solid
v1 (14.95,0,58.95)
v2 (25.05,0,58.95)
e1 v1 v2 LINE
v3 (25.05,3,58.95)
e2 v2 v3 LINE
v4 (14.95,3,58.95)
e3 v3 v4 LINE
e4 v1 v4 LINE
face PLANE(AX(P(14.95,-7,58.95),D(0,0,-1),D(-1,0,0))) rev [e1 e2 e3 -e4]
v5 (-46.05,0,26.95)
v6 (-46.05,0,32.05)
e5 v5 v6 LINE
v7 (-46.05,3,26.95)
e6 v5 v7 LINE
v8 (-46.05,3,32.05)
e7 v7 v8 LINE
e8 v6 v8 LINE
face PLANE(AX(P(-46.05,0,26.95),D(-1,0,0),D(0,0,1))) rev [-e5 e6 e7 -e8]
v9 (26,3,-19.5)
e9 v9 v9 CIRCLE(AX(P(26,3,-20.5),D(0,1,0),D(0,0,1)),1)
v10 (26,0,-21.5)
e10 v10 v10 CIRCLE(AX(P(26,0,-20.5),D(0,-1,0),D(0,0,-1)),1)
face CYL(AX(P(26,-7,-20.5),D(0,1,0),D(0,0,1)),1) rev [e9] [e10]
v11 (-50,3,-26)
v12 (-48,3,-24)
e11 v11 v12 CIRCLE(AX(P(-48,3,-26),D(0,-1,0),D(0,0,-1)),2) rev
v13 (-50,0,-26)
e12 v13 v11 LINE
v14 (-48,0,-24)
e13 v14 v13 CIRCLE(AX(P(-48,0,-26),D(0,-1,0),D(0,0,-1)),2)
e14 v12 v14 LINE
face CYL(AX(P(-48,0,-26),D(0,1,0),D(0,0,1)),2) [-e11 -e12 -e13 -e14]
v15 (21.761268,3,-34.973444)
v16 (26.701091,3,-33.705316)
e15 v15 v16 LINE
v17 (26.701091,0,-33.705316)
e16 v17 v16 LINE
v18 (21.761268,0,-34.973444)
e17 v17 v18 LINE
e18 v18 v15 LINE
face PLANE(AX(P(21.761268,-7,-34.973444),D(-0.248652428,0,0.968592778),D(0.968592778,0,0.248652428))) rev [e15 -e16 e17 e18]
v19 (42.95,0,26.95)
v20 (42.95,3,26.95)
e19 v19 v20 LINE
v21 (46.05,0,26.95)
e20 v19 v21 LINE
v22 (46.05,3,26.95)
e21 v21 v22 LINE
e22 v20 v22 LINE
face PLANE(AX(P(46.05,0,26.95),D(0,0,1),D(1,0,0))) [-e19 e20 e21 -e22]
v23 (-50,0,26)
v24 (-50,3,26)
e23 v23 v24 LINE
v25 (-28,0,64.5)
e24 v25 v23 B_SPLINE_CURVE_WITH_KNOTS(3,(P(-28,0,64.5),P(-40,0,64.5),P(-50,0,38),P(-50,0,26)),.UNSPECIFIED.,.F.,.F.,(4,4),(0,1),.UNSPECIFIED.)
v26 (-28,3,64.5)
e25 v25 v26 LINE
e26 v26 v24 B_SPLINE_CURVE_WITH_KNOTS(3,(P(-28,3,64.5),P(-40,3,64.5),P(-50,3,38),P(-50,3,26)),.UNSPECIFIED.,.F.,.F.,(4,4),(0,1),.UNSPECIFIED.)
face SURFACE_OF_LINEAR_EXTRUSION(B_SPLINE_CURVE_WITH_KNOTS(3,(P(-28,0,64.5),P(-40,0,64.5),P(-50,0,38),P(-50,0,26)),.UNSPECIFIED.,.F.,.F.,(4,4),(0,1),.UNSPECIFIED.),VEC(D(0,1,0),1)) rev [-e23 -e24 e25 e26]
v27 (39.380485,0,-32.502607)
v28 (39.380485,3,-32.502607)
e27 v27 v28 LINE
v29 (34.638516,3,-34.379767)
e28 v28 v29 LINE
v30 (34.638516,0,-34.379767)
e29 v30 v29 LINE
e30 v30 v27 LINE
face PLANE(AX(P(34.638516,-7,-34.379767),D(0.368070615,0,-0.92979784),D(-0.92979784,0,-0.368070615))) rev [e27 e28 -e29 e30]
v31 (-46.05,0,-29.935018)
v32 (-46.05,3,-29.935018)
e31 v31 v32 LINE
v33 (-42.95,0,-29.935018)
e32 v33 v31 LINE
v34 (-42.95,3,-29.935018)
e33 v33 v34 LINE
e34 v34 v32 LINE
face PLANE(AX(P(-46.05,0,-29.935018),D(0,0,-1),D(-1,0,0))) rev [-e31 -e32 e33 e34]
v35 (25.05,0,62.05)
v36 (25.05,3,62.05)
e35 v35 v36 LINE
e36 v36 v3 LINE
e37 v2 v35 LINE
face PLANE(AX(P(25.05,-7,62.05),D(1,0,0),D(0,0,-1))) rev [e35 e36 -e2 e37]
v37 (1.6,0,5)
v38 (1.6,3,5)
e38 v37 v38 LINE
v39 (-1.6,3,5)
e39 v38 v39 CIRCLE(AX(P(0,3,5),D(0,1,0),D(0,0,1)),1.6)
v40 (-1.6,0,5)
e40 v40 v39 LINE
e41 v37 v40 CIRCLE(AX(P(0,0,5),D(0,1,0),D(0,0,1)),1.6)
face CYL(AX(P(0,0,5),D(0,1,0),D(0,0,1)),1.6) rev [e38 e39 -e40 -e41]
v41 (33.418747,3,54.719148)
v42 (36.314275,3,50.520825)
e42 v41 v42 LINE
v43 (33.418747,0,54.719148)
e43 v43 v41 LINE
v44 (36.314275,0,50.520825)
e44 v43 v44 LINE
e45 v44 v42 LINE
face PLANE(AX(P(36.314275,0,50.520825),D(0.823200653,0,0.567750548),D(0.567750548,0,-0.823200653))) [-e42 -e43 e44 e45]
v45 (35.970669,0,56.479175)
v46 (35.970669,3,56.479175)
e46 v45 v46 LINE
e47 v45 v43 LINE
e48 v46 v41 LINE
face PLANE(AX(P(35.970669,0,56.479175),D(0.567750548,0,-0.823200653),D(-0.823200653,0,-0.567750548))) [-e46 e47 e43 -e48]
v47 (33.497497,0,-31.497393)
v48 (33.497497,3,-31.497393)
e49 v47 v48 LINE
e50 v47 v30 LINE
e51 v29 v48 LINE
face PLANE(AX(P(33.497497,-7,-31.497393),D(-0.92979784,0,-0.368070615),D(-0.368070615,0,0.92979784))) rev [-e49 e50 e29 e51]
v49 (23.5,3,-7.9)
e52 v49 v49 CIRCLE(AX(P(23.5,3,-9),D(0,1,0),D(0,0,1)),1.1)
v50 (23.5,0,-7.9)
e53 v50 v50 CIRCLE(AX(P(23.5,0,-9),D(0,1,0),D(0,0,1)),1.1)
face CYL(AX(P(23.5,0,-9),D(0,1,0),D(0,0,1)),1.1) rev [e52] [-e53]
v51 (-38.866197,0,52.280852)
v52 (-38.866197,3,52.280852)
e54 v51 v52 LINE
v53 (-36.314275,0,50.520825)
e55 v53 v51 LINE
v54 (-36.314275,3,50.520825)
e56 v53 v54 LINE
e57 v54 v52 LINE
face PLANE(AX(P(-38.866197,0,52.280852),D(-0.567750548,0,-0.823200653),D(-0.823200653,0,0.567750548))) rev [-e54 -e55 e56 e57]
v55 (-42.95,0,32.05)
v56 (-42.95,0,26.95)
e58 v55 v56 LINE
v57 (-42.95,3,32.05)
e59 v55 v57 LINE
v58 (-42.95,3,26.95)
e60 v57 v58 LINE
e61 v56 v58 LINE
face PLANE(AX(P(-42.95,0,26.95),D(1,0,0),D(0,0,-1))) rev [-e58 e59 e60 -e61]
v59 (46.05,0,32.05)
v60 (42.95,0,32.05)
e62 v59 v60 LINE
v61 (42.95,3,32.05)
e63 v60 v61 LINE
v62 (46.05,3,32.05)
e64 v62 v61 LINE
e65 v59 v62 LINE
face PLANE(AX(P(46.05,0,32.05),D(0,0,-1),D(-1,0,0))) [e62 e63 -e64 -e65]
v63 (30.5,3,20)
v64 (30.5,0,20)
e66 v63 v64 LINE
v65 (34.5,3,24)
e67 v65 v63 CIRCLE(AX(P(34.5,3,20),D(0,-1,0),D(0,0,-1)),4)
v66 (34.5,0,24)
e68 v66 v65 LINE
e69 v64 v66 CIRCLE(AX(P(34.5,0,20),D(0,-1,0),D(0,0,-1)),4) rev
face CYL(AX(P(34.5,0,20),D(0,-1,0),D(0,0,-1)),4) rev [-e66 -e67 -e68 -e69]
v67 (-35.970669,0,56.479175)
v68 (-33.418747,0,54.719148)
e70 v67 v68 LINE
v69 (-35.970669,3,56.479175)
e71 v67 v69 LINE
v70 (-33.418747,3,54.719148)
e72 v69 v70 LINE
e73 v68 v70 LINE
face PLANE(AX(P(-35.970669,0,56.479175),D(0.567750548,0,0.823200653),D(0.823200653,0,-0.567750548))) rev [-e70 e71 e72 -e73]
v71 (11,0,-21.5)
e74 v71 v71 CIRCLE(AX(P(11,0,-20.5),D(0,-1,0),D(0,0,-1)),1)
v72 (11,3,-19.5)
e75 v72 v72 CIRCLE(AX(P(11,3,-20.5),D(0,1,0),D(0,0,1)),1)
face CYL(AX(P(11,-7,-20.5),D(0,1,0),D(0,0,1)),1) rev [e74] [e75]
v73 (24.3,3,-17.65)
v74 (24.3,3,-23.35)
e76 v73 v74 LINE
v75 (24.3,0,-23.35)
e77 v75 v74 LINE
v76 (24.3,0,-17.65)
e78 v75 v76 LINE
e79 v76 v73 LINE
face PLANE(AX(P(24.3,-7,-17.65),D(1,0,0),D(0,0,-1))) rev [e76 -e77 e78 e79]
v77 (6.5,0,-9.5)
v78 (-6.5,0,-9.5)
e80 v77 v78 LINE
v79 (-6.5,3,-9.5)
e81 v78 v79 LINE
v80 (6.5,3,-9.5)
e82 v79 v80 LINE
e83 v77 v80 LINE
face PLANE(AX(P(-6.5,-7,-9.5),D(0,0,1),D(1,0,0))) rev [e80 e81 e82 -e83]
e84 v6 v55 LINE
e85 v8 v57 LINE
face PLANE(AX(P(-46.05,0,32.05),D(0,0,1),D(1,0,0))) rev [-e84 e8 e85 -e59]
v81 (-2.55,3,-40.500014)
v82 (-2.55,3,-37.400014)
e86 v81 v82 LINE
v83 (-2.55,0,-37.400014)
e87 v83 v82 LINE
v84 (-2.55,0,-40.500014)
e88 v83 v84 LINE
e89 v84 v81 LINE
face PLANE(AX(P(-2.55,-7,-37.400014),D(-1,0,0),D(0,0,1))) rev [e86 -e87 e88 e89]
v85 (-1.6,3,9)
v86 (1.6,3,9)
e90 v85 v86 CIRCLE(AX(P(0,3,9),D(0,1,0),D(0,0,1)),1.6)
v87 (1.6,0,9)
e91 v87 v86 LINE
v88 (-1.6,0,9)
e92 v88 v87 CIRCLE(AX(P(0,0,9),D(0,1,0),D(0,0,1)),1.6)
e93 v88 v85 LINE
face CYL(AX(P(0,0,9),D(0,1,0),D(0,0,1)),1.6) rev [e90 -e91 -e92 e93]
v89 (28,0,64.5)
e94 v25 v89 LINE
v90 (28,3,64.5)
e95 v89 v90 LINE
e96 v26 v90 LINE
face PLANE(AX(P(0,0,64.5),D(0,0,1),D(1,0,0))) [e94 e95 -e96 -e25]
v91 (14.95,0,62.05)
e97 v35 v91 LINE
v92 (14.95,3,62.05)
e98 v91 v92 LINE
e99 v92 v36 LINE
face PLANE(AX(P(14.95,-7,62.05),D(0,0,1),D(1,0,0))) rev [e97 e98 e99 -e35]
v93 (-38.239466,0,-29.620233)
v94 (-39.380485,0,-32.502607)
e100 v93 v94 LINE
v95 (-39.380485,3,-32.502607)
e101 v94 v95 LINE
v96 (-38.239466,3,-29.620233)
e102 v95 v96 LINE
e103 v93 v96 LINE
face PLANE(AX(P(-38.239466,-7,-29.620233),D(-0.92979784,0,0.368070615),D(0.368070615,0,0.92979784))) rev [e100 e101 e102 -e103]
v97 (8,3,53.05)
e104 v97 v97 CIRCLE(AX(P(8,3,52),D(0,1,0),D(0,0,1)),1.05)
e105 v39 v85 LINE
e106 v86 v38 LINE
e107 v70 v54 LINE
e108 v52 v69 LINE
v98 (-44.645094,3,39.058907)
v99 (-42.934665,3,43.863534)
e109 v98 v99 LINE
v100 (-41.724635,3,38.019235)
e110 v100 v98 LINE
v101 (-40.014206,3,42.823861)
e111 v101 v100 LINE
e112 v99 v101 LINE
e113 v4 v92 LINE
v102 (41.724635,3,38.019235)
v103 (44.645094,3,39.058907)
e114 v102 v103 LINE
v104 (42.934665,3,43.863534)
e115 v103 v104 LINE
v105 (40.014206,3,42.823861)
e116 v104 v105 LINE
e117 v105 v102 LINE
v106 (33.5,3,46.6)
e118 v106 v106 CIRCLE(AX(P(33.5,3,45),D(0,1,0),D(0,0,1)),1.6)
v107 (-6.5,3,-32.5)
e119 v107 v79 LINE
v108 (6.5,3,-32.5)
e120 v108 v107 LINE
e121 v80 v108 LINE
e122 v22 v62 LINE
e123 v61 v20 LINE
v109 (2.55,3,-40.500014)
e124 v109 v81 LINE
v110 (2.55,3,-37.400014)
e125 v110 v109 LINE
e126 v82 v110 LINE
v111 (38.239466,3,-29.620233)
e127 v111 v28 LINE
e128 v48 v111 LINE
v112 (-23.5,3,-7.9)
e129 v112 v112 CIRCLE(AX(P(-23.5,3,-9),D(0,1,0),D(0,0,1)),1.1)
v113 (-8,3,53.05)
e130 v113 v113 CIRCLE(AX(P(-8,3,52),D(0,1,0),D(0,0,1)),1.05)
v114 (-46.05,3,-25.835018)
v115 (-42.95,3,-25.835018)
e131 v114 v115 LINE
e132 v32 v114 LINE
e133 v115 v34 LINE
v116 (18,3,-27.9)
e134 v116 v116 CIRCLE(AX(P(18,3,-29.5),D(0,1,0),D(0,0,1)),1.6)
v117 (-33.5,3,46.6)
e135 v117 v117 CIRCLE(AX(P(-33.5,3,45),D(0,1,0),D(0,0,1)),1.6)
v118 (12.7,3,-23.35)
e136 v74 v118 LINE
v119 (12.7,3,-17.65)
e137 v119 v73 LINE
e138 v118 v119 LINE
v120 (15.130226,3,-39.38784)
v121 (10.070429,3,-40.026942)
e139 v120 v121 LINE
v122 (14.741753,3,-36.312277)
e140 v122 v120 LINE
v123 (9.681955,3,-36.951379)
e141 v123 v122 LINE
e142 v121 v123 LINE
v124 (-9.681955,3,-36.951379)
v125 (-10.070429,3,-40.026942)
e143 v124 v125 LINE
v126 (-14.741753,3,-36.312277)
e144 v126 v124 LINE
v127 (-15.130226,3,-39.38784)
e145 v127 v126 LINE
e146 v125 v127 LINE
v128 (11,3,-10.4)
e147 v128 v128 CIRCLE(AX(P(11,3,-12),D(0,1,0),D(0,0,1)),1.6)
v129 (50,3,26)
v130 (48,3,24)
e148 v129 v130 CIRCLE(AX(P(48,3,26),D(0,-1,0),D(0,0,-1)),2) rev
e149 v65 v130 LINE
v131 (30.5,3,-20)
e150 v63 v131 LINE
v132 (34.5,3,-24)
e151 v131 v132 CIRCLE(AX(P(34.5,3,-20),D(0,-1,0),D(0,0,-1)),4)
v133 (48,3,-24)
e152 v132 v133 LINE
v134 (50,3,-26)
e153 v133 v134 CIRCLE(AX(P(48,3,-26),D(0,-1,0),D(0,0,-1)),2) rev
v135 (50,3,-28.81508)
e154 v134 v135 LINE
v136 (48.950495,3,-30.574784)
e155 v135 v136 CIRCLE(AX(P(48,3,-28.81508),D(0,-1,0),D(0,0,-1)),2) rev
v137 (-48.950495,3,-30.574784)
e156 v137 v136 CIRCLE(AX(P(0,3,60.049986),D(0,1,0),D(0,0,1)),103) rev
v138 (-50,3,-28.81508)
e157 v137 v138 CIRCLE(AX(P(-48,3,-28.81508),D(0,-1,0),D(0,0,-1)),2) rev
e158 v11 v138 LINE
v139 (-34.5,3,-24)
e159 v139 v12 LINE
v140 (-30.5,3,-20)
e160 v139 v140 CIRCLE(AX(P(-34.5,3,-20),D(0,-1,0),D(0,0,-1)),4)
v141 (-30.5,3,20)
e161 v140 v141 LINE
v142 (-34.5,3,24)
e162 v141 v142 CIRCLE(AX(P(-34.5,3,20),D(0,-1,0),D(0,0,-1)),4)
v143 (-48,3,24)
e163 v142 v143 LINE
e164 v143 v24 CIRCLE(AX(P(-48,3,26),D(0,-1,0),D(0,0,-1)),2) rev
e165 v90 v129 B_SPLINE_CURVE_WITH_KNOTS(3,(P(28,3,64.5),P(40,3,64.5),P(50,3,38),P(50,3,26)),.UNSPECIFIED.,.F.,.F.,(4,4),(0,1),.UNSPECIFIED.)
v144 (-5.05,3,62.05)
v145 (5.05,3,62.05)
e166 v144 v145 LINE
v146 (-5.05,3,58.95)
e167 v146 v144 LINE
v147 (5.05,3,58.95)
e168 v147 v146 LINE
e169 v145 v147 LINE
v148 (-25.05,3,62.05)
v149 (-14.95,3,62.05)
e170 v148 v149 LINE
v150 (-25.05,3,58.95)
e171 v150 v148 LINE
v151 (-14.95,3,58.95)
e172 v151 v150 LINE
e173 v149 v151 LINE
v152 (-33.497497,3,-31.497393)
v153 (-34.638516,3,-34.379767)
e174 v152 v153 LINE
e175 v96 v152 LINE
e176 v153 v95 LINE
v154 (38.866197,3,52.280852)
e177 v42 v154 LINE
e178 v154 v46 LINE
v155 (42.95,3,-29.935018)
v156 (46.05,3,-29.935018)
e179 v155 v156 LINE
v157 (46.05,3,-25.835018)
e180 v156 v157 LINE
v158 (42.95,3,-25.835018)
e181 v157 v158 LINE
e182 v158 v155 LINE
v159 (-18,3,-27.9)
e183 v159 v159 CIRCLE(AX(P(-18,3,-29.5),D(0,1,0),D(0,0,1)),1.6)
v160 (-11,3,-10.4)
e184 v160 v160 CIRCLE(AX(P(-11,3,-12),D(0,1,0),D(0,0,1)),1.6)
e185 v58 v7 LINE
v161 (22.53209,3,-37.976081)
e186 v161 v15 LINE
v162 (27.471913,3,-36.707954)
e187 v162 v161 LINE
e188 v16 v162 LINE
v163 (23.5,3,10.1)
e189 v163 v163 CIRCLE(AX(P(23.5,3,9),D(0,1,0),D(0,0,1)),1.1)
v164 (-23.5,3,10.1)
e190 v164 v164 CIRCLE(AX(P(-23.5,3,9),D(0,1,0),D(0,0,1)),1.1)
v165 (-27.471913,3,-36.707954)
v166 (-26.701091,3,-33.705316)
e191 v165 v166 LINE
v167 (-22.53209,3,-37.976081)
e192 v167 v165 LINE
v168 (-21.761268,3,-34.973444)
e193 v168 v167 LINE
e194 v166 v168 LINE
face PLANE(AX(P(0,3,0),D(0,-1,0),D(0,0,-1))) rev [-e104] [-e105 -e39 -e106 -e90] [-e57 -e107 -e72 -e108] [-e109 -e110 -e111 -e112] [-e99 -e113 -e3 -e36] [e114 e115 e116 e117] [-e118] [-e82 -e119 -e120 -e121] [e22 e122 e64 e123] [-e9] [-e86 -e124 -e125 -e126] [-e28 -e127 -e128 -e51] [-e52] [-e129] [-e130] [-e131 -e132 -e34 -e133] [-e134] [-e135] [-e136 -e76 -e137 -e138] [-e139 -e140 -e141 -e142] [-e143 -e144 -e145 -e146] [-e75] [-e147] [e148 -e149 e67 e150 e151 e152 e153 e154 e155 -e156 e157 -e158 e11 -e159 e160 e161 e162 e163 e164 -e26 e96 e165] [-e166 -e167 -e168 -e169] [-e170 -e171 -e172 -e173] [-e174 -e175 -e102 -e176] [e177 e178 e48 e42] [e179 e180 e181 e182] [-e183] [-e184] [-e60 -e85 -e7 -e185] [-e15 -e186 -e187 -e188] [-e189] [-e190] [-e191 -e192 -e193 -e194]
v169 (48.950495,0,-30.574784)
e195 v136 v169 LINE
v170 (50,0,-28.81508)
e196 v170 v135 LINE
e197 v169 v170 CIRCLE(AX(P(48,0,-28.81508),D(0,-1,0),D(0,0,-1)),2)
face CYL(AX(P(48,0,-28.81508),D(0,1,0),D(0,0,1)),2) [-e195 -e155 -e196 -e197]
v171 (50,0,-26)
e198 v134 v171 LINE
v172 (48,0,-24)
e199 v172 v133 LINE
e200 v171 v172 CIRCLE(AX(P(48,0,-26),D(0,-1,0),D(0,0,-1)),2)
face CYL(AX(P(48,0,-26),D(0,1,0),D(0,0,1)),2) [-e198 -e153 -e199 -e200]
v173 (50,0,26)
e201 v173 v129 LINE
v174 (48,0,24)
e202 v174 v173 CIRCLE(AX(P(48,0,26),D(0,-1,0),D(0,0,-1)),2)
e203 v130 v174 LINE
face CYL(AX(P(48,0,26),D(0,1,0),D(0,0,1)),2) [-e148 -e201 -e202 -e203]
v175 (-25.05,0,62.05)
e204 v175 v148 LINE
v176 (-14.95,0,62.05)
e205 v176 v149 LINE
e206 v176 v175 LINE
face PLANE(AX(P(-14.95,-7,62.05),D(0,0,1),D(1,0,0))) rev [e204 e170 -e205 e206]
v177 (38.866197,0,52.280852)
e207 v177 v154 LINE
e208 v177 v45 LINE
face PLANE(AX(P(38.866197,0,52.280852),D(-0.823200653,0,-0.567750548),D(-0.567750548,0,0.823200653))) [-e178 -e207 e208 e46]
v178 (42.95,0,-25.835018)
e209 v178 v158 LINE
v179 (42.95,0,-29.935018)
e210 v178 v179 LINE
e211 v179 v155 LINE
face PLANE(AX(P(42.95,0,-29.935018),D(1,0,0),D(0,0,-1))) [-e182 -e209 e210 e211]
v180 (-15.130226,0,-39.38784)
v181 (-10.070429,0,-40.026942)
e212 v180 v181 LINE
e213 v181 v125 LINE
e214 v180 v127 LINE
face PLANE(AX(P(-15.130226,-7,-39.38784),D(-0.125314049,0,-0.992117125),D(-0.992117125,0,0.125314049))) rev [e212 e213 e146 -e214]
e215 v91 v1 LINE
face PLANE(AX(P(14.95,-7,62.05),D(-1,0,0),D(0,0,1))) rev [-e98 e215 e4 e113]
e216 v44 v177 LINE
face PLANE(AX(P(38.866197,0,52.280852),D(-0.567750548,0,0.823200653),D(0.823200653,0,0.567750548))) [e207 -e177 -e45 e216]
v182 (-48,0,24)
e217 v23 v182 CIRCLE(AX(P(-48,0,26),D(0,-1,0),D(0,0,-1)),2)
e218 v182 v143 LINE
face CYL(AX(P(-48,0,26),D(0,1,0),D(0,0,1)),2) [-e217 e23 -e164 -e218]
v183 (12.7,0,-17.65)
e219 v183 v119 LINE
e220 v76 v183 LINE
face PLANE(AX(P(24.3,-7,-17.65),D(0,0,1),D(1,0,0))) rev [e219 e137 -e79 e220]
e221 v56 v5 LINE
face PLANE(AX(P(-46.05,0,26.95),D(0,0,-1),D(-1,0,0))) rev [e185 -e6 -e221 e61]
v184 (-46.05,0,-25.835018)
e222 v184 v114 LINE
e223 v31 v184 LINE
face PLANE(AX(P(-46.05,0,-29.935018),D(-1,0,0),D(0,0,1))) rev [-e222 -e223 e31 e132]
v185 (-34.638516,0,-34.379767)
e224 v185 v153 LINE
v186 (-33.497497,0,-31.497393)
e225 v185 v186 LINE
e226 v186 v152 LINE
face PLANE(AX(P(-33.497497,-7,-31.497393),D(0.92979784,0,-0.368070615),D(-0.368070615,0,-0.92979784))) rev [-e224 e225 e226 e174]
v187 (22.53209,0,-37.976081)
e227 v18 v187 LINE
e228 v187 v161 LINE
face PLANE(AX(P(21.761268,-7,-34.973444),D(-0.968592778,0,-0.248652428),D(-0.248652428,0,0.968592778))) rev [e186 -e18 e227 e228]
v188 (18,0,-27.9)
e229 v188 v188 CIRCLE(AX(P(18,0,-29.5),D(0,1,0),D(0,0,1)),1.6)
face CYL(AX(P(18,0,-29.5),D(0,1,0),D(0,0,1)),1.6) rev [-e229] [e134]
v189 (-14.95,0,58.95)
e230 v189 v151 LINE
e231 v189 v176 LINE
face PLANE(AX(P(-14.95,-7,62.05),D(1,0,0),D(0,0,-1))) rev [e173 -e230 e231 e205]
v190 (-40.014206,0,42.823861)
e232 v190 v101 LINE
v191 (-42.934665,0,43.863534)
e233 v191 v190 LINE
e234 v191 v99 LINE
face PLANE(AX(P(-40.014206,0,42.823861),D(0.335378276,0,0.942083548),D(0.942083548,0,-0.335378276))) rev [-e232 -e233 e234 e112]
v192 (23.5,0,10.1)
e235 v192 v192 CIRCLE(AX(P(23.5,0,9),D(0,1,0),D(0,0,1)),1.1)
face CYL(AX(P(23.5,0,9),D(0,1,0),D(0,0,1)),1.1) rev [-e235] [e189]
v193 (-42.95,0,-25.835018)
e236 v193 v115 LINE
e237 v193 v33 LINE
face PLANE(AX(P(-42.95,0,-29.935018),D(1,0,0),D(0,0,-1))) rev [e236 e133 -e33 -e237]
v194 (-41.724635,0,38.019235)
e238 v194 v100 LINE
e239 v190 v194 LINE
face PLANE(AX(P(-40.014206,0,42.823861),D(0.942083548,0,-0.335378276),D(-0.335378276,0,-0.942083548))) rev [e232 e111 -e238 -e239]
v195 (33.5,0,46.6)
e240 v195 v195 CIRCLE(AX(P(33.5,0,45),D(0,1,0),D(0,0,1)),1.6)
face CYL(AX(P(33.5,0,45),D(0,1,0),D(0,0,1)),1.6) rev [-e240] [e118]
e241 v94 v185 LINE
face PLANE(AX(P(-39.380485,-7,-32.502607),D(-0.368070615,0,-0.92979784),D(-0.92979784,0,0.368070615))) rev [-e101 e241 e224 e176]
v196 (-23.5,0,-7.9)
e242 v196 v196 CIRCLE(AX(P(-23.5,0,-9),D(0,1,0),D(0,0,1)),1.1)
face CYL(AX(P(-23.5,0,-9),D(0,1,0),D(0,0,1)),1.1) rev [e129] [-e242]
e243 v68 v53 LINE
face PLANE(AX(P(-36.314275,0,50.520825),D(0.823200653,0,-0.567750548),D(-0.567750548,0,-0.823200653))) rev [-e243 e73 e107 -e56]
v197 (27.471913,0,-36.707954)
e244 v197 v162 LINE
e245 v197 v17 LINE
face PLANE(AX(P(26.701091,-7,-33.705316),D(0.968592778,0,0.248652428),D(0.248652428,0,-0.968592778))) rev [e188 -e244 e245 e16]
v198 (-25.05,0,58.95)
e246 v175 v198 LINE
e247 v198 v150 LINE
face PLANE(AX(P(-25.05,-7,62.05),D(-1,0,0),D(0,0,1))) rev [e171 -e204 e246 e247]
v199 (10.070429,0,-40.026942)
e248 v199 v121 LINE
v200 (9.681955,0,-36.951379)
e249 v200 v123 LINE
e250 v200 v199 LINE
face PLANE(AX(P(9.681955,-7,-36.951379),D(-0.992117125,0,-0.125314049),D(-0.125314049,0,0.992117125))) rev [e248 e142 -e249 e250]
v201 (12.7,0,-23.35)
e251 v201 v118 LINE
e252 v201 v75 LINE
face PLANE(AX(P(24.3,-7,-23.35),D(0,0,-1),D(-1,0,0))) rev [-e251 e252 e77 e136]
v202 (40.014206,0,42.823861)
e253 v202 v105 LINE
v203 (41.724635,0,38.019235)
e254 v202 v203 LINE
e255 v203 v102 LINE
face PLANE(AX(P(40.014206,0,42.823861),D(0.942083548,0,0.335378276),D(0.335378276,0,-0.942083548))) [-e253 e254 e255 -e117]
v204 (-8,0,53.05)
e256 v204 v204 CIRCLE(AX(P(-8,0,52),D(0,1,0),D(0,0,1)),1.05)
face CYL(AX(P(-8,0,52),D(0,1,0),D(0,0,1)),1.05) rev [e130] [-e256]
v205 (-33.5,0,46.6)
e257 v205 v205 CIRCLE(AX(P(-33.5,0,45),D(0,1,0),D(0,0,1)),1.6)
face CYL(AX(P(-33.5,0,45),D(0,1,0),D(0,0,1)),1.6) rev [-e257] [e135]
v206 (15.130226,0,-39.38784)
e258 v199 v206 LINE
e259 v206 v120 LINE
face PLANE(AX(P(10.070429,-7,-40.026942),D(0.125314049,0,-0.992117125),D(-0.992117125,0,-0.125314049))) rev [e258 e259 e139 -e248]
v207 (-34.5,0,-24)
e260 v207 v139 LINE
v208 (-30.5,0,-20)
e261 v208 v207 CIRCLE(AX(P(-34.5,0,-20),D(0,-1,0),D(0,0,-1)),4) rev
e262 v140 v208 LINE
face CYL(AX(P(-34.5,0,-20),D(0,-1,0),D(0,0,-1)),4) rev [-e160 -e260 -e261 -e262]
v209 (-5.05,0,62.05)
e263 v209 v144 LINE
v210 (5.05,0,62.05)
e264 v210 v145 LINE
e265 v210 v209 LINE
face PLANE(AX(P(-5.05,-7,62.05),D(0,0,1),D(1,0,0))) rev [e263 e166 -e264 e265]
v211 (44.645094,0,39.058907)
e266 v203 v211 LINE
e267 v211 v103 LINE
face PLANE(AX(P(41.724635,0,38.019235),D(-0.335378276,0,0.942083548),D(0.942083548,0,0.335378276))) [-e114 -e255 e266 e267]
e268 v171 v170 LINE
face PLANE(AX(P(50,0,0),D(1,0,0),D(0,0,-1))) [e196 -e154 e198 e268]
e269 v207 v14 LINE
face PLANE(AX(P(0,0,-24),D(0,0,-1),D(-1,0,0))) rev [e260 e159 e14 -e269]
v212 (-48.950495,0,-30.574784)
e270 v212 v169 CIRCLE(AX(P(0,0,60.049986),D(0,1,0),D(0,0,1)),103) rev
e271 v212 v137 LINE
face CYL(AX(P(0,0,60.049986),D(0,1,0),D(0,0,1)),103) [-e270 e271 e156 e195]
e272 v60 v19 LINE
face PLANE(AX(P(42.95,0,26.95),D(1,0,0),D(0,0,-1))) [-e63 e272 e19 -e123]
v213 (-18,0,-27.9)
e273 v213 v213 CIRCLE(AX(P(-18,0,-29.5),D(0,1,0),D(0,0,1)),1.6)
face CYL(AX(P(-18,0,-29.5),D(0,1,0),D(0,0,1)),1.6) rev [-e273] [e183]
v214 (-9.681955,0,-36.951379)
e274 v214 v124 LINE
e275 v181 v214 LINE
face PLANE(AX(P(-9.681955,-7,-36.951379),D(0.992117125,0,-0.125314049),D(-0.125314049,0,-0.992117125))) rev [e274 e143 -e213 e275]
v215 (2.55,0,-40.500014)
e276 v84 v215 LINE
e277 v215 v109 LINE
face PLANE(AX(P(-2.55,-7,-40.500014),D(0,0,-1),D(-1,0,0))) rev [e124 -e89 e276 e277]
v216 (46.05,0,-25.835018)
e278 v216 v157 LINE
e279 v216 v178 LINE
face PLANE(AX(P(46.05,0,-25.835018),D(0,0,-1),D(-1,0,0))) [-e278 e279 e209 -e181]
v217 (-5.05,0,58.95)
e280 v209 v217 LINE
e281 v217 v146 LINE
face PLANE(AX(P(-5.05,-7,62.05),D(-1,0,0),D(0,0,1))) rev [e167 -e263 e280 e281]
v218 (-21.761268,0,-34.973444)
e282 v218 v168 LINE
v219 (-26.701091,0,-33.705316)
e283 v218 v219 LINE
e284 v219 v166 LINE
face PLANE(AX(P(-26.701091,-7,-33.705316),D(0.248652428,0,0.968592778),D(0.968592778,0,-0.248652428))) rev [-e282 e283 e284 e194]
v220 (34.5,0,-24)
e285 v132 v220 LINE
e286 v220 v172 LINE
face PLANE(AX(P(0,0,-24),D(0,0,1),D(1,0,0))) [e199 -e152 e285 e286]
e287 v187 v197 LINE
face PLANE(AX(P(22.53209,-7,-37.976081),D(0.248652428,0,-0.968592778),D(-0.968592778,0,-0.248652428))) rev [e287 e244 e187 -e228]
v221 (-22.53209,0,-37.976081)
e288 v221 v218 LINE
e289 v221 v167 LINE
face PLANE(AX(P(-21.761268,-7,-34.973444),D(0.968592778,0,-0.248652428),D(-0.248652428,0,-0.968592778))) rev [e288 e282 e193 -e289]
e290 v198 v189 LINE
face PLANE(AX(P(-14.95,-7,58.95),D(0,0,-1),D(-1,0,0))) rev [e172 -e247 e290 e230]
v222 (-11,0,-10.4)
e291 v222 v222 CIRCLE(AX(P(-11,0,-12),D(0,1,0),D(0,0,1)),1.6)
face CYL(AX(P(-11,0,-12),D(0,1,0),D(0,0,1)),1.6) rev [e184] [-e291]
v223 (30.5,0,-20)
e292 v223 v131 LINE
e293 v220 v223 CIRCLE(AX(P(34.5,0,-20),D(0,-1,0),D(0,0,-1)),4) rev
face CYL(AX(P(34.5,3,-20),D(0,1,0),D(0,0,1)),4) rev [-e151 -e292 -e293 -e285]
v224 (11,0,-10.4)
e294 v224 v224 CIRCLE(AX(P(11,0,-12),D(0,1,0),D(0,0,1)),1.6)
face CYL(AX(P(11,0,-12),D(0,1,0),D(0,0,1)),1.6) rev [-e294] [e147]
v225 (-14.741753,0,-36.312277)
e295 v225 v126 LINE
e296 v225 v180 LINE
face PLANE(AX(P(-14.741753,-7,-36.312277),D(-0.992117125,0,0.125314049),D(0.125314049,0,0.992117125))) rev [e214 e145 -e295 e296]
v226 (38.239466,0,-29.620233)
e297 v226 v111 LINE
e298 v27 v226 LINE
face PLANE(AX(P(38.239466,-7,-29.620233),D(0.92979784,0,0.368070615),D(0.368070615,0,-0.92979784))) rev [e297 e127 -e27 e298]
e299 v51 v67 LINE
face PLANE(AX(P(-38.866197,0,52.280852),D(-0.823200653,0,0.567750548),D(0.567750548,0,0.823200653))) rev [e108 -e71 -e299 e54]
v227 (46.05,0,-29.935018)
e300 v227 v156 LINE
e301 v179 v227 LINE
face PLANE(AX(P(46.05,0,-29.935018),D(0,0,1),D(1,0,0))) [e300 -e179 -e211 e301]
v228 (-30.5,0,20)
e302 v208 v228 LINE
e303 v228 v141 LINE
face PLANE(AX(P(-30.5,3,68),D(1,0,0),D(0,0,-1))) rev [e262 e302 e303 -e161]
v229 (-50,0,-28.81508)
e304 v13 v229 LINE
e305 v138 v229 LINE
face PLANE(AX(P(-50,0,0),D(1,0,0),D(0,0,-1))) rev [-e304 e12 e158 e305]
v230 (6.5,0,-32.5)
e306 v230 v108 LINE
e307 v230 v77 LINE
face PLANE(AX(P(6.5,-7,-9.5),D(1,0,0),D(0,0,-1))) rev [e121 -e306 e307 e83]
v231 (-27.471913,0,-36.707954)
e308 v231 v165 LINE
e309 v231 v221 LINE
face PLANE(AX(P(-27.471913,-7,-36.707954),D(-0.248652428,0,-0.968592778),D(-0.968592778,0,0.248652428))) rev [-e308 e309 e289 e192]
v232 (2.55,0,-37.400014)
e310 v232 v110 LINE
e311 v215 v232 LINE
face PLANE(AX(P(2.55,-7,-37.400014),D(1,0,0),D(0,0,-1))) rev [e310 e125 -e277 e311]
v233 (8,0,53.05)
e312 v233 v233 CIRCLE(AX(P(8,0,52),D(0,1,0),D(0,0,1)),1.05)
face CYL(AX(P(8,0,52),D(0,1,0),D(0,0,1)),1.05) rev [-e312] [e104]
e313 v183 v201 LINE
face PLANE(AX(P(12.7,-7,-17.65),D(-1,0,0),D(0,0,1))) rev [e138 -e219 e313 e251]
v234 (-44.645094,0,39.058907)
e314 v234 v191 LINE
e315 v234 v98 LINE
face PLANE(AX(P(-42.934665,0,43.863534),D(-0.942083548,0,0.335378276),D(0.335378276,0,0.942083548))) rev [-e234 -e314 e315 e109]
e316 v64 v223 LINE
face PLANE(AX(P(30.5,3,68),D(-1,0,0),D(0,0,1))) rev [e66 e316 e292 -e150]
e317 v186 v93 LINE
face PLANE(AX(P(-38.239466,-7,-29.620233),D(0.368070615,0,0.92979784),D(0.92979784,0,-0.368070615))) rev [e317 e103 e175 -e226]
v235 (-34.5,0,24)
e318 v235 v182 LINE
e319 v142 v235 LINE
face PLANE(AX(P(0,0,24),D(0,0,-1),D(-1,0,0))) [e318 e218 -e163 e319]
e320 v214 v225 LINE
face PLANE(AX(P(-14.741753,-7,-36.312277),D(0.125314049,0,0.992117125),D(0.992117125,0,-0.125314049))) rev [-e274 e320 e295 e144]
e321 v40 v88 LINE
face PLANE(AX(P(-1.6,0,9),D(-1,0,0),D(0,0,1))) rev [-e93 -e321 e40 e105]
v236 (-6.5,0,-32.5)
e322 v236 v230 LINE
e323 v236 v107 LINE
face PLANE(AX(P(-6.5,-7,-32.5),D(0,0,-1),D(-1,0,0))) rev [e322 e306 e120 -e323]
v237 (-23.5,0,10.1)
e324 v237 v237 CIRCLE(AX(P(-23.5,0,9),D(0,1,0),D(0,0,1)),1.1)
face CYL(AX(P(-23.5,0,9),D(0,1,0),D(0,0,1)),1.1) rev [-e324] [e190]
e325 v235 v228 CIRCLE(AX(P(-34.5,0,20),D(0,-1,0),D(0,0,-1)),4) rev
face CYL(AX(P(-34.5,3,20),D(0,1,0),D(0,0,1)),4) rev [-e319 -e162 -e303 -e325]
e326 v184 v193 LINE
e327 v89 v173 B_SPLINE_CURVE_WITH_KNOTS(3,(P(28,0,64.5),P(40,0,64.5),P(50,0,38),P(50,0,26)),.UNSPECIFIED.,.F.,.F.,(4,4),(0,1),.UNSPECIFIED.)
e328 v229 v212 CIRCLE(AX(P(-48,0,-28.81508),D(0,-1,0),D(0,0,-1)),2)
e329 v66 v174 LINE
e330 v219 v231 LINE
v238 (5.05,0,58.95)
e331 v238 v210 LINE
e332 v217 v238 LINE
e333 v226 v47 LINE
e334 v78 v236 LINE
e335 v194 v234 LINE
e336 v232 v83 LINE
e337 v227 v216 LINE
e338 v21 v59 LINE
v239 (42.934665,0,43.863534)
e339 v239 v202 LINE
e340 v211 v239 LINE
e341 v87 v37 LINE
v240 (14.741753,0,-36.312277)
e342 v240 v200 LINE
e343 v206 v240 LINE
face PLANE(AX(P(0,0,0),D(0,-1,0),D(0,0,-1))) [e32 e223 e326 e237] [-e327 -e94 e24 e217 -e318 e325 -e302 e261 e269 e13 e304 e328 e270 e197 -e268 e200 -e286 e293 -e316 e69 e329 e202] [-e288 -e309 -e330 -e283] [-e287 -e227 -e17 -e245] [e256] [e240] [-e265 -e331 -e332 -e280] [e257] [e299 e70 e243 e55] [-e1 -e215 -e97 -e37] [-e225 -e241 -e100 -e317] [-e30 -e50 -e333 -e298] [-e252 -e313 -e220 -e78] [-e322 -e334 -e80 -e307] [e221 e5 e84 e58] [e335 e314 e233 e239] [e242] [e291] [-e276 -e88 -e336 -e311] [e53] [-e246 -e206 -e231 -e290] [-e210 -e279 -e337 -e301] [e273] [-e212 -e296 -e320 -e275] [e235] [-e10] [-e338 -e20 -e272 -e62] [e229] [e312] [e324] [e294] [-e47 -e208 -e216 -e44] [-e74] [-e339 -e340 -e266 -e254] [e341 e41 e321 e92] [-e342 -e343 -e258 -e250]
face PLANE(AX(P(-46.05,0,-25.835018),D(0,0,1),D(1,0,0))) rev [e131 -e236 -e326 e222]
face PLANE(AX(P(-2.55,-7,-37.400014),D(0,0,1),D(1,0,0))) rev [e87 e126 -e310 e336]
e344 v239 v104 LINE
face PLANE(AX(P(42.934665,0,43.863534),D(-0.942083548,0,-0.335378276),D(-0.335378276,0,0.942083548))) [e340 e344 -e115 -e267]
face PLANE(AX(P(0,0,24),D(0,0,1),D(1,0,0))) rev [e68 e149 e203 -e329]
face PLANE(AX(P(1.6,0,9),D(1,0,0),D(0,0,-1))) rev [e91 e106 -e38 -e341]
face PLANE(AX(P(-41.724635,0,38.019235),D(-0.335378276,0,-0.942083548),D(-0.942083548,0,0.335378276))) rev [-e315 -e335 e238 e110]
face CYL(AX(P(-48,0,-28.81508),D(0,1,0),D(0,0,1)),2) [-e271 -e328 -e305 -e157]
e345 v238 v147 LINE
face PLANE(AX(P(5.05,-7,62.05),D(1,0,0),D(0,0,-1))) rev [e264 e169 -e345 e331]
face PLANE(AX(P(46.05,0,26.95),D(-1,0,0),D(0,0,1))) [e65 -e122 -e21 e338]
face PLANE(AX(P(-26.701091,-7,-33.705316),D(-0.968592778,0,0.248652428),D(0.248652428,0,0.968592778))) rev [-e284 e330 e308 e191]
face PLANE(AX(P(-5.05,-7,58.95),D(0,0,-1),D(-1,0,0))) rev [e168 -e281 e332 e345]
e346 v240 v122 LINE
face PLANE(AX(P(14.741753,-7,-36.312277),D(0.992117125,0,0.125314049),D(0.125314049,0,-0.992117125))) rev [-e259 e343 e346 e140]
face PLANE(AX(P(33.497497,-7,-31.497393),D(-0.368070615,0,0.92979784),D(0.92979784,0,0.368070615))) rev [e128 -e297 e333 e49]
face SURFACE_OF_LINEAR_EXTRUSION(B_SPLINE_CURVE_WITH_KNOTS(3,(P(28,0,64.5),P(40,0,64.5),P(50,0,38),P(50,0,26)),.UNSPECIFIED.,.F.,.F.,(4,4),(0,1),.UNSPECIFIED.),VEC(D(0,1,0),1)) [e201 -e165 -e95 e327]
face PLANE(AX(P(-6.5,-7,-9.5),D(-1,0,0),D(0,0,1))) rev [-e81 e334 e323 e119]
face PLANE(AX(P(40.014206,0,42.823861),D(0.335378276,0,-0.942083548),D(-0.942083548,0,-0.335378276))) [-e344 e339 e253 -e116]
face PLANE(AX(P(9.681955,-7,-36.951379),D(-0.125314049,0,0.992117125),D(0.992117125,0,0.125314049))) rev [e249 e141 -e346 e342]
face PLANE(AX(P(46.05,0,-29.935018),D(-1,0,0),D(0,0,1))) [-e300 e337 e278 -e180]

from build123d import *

# Parameters (mm, degrees)
CROQUIS1_W              = 61
CROQUIS1_H              = 100
SALIENTE_EXTRUIR1_DEPTH = 3
CROQUIS7_W              = 19.5
CROQUIS7_H              = 40.5
SALIENTE_EXTRUIR4_DEPTH = 3
CROQUIS17_W             = 61
CROQUIS17_H             = 3.5
CORTAR_EXTRUIR10_DEPTH  = 10
CROQUIS2_R              = 1.1
CROQUIS2_R_2            = 1.05
CORTAR_EXTRUIR1_DEPTH   = 3
CROQUIS8_W              = 13
CROQUIS8_H              = 23
CORTAR_EXTRUIR3_DEPTH   = 10
CROQUIS3_R              = 1.6
CORTAR_EXTRUIR2_DEPTH   = 82.665476182
CROQUIS12_R             = 1.6
CORTAR_EXTRUIR6_DEPTH   = 82.665476182
CORTAR_EXTRUIR7_DEPTH   = 82.665476182
REDONDEO2_R             = 4
REDONDEO3_R             = 2
CORTAR_EXTRUIR8_DEPTH   = 10
MATRIZ_CRV1_OUTLINE_W   = 5.1
MATRIZ_CRV1_OUTLINE_H   = 3.1
MATRIZ_CRV1_DEPTH       = 3
CROQUIS16_W             = 3.1
CROQUIS16_H             = 4.1
CROQUIS16_H_2           = 5.1
CORTAR_EXTRUIR9_DEPTH   = 3
CORTAR_EXTRUIR13_DEPTH  = 82.665476326
CROQUIS18_W             = 10.1
CROQUIS18_H             = 3.1
CORTAR_EXTRUIR11_DEPTH  = 10
CROQUIS9_R              = 1
CROQUIS9_W              = 11.6
CROQUIS9_H              = 5.7
CORTAR_EXTRUIR4_DEPTH   = 10


# Read off the part's stored shape, not the designer's step: Matriz Crv1
with BuildPart() as part:
    # Croquis1 → Saliente-Extruir1 (new body)
    with BuildSketch(Plane(origin=(0, 0, 0), x_dir=(1, 0, 0), z_dir=(0, 1, 0))):
        with Locations((0, -18)):
            Rectangle(CROQUIS1_W, CROQUIS1_H)
    extrude(amount=SALIENTE_EXTRUIR1_DEPTH)

    # Croquis7 → Saliente-Extruir4 (add, through all)
    with BuildSketch(Plane(origin=(0, 3, 0), x_dir=(1, 0, 0), z_dir=(0, 1, 0))):
        with BuildLine():
            Line((-30.5, 24), (-30.5, 32))
            Line((-30.5, 32), (30.5, 32))
            Line((30.5, 32), (30.5, 24))
            Line((30.5, 24), (50, 24))
            Line((50, 24), (50, 30))
            ThreePointArc((50, 30), (0, 42.950013881), (-50, 30))
            Line((-50, 30), (-50, 24))
            Line((-50, 24), (-30.5, 24))
        make_face()
        with Locations((-40.25, -44.25)):
            Rectangle(CROQUIS7_W, CROQUIS7_H)
        with Locations((40.25, -44.25)):
            Rectangle(CROQUIS7_W, CROQUIS7_H)
    extrude(amount=-SALIENTE_EXTRUIR4_DEPTH)

    # Croquis17 → Cortar-Extruir10 (cut)
    with BuildSketch(Plane(origin=(0, 3, 0), x_dir=(1, 0, 0), z_dir=(0, 1, 0))):
        with Locations((0, -66.25)):
            Rectangle(CROQUIS17_W, CROQUIS17_H)
    extrude(amount=-CORTAR_EXTRUIR10_DEPTH, mode=Mode.SUBTRACT)

    # Croquis2 → Cortar-Extruir1 (cut)
    with BuildSketch(Plane(origin=(0, 3, 0), x_dir=(1, 0, 0), z_dir=(0, 1, 0))):
        with Locations(Location((23.5, 9, 0), (0, 0, 270))):
            Circle(CROQUIS2_R)
        with Locations(Location((23.5, -9, 0), (0, 0, 270))):
            Circle(CROQUIS2_R)
        with Locations(Location((-23.5, 9, 0), (0, 0, 270))):
            Circle(CROQUIS2_R)
        with Locations(Location((-23.5, -9, 0), (0, 0, 270))):
            Circle(CROQUIS2_R)
        with Locations(Location((-8, -52, 0), (0, 0, 270))):
            Circle(CROQUIS2_R_2)
        with Locations(Location((8, -52, 0), (0, 0, 270))):
            Circle(CROQUIS2_R_2)
    extrude(amount=-CORTAR_EXTRUIR1_DEPTH, mode=Mode.SUBTRACT)

    # Croquis8 → Cortar-Extruir3 (cut)
    with BuildSketch(Plane(origin=(0, 3, 0), x_dir=(1, 0, 0), z_dir=(0, 1, 0))):
        with Locations((0, 21)):
            Rectangle(CROQUIS8_W, CROQUIS8_H)
    extrude(amount=-CORTAR_EXTRUIR3_DEPTH, mode=Mode.SUBTRACT)

    # Croquis3 → Cortar-Extruir2 (cut, through all)
    with BuildSketch(Plane(origin=(0, 3, 0), x_dir=(1, 0, 0), z_dir=(0, 1, 0))):
        with Locations(Location((-11, 12, 0), (0, 0, 270))):
            Circle(CROQUIS3_R)
        with Locations(Location((11, 12, 0), (0, 0, 270))):
            Circle(CROQUIS3_R)
        with Locations(Location((-33.5, -45, 0), (0, 0, 270))):
            Circle(CROQUIS3_R)
        with Locations(Location((33.5, -45, 0), (0, 0, 270))):
            Circle(CROQUIS3_R)
        with BuildLine():
            Line((-1.6, -9), (-1.6, -5))
            ThreePointArc((-1.6, -5), (0, -3.4), (1.6, -5))
            Line((1.6, -5), (1.6, -9))
            ThreePointArc((1.6, -9), (0, -10.6), (-1.6, -9))
        make_face()
    extrude(amount=-CORTAR_EXTRUIR2_DEPTH, mode=Mode.SUBTRACT)

    # Croquis12 → Cortar-Extruir6 (cut, through all)
    with BuildSketch(Plane(origin=(0, 3, 0), x_dir=(1, 0, 0), z_dir=(0, 1, 0))):
        with Locations(Location((-18, 29.5, 0), (0, 0, 270))):
            Circle(CROQUIS12_R)
        with Locations(Location((18, 29.5, 0), (0, 0, 270))):
            Circle(CROQUIS12_R)
    extrude(amount=-CORTAR_EXTRUIR6_DEPTH, mode=Mode.SUBTRACT)

    # Croquis14 → Cortar-Extruir7 (cut, through all)
    with BuildSketch(Plane(origin=(0, 3, 0), x_dir=(1, 0, 0), z_dir=(0, 1, 0))):
        with BuildLine():
            Line((-50, -26), (-50, -64.5))
            Line((-50, -64.5), (-28, -64.5))
            add(Edge.make_bspline(
                [(-50, -26), (-50, -38), (-40, -64.5), (-28, -64.5)],
                knots=[0, 0, 0, 0, 1, 1, 1, 1], degree=3))
        make_face()
    cortar_extruir7 = extrude(amount=-CORTAR_EXTRUIR7_DEPTH, mode=Mode.SUBTRACT)

    # Redondeo2
    redondeo2_edges = [part.edges().sort_by_distance(p)[0] for p in [
        (30.5, 1.5, -24),
        (-30.5, 1.5, -24),
        (-30.5, 1.5, 24),
        (30.5, 1.5, 24),
    ]]
    fillet(redondeo2_edges, radius=REDONDEO2_R)

    # Redondeo3
    redondeo3_edges = [part.edges().sort_by_distance(p)[0] for p in [
        (-50, 1.5, -30),
        (50, 1.5, -30),
        (50, 1.5, -24),
        (-50, 1.5, -24),
        (-50, 1.5, 24),
        (50, 1.5, 24),
    ]]
    fillet(redondeo3_edges, radius=REDONDEO3_R - 0.0001)  # a hair under: the kernel refuses the full size

    # Croquis15 → Cortar-Extruir8 (cut)
    with BuildSketch(Plane(origin=(0, 3, 0), x_dir=(1, 0, 0), z_dir=(0, 1, 0))):
        Polygon((-38.239465907, 29.620233281), (-33.497496925, 31.497393416), (-34.638515831, 34.379766719), (-39.380484813, 32.502606584), align=None)
    extrude(amount=-CORTAR_EXTRUIR8_DEPTH, mode=Mode.SUBTRACT)

    # Matriz Crv1 outline → Matriz Crv1 (cut)
    with BuildSketch(Plane(origin=(0, 0, 0), x_dir=(1, 0, 0), z_dir=(0, 1, 0))):
        Polygon((39.380484813, 32.502606584), (34.638515831, 34.379766719), (33.497496925, 31.497393416), (38.239465907, 29.620233281), align=None)
        Polygon((27.471913222, 36.707954041), (22.532090053, 37.976081424), (21.761267526, 34.973443811), (26.701090695, 33.705316428), align=None)
        Polygon((15.130226298, 39.387839944), (10.070428962, 40.026941594), (9.68195541, 36.951378508), (14.741752746, 36.312276858), align=None)
        with Locations((0, 38.950013881)):
            Rectangle(MATRIZ_CRV1_OUTLINE_W, MATRIZ_CRV1_OUTLINE_H)
        Polygon((-10.070428962, 40.026941594), (-15.130226298, 39.387839944), (-14.741752746, 36.312276858), (-9.68195541, 36.951378508), align=None)
        Polygon((-22.532090053, 37.976081424), (-27.471913222, 36.707954041), (-26.701090695, 33.705316428), (-21.761267526, 34.973443811), align=None)
    extrude(amount=MATRIZ_CRV1_DEPTH, mode=Mode.SUBTRACT)

    # Croquis16 → Cortar-Extruir9 (cut)
    with BuildSketch(Plane(origin=(0, 3, 0), x_dir=(1, 0, 0), z_dir=(0, 1, 0))):
        with Locations((-44.5, 27.885018263)):
            Rectangle(CROQUIS16_W, CROQUIS16_H)
        with Locations((-44.5, -29.5)):
            Rectangle(CROQUIS16_W, CROQUIS16_H_2)
    cortar_extruir9 = extrude(amount=-CORTAR_EXTRUIR9_DEPTH, mode=Mode.SUBTRACT)

    # Croquis19 → Cortar-Extruir13 (cut, through all)
    with BuildSketch(Plane(origin=(0, 3, 0), x_dir=(1, 0, 0), z_dir=(0, 1, 0))):
        Polygon((-40.014205747, -42.823860895), (-41.724634952, -38.019234798), (-44.645093952, -39.058907452), (-42.934664747, -43.863533549), align=None)
        Polygon((-38.866197007, -52.280851683), (-35.970669214, -56.479175015), (-33.418747189, -54.719148317), (-36.314274981, -50.520824985), align=None)
    cortar_extruir13 = extrude(amount=-CORTAR_EXTRUIR13_DEPTH, mode=Mode.SUBTRACT)

    # Simetría1: Cortar-Extruir7, Cortar-Extruir9, Cortar-Extruir13 across plane
    add(cortar_extruir7.mirror(Plane(origin=(0, 0, 0), x_dir=(0, 0, 1), z_dir=(1, 0, 0))), mode=Mode.SUBTRACT)
    add(cortar_extruir9.mirror(Plane(origin=(0, 0, 0), x_dir=(0, 0, 1), z_dir=(1, 0, 0))), mode=Mode.SUBTRACT)
    add(cortar_extruir13.mirror(Plane(origin=(0, 0, 0), x_dir=(0, 0, 1), z_dir=(1, 0, 0))), mode=Mode.SUBTRACT)

    # Croquis18 → Cortar-Extruir11 (cut)
    with BuildSketch(Plane(origin=(0, 3, 0), x_dir=(1, 0, 0), z_dir=(0, 1, 0))):
        with Locations((0, -60.5)):
            Rectangle(CROQUIS18_W, CROQUIS18_H)
        with Locations((20, -60.5)):
            Rectangle(CROQUIS18_W, CROQUIS18_H)
        with Locations((-20, -60.5)):
            Rectangle(CROQUIS18_W, CROQUIS18_H)
    extrude(amount=-CORTAR_EXTRUIR11_DEPTH, mode=Mode.SUBTRACT)

    # Croquis9 → Cortar-Extruir4 (cut)
    with BuildSketch(Plane(origin=(0, 3, 0), x_dir=(1, 0, 0), z_dir=(0, 1, 0))):
        with Locations(Location((11, 20.5, 0), (0, 0, 270))):
            Circle(CROQUIS9_R)
        with Locations(Location((26, 20.5, 0), (0, 0, 270))):
            Circle(CROQUIS9_R)
        with Locations((18.5, 20.5)):
            Rectangle(CROQUIS9_W, CROQUIS9_H)
    extrude(amount=-CORTAR_EXTRUIR4_DEPTH, mode=Mode.SUBTRACT)


solid = part.part
